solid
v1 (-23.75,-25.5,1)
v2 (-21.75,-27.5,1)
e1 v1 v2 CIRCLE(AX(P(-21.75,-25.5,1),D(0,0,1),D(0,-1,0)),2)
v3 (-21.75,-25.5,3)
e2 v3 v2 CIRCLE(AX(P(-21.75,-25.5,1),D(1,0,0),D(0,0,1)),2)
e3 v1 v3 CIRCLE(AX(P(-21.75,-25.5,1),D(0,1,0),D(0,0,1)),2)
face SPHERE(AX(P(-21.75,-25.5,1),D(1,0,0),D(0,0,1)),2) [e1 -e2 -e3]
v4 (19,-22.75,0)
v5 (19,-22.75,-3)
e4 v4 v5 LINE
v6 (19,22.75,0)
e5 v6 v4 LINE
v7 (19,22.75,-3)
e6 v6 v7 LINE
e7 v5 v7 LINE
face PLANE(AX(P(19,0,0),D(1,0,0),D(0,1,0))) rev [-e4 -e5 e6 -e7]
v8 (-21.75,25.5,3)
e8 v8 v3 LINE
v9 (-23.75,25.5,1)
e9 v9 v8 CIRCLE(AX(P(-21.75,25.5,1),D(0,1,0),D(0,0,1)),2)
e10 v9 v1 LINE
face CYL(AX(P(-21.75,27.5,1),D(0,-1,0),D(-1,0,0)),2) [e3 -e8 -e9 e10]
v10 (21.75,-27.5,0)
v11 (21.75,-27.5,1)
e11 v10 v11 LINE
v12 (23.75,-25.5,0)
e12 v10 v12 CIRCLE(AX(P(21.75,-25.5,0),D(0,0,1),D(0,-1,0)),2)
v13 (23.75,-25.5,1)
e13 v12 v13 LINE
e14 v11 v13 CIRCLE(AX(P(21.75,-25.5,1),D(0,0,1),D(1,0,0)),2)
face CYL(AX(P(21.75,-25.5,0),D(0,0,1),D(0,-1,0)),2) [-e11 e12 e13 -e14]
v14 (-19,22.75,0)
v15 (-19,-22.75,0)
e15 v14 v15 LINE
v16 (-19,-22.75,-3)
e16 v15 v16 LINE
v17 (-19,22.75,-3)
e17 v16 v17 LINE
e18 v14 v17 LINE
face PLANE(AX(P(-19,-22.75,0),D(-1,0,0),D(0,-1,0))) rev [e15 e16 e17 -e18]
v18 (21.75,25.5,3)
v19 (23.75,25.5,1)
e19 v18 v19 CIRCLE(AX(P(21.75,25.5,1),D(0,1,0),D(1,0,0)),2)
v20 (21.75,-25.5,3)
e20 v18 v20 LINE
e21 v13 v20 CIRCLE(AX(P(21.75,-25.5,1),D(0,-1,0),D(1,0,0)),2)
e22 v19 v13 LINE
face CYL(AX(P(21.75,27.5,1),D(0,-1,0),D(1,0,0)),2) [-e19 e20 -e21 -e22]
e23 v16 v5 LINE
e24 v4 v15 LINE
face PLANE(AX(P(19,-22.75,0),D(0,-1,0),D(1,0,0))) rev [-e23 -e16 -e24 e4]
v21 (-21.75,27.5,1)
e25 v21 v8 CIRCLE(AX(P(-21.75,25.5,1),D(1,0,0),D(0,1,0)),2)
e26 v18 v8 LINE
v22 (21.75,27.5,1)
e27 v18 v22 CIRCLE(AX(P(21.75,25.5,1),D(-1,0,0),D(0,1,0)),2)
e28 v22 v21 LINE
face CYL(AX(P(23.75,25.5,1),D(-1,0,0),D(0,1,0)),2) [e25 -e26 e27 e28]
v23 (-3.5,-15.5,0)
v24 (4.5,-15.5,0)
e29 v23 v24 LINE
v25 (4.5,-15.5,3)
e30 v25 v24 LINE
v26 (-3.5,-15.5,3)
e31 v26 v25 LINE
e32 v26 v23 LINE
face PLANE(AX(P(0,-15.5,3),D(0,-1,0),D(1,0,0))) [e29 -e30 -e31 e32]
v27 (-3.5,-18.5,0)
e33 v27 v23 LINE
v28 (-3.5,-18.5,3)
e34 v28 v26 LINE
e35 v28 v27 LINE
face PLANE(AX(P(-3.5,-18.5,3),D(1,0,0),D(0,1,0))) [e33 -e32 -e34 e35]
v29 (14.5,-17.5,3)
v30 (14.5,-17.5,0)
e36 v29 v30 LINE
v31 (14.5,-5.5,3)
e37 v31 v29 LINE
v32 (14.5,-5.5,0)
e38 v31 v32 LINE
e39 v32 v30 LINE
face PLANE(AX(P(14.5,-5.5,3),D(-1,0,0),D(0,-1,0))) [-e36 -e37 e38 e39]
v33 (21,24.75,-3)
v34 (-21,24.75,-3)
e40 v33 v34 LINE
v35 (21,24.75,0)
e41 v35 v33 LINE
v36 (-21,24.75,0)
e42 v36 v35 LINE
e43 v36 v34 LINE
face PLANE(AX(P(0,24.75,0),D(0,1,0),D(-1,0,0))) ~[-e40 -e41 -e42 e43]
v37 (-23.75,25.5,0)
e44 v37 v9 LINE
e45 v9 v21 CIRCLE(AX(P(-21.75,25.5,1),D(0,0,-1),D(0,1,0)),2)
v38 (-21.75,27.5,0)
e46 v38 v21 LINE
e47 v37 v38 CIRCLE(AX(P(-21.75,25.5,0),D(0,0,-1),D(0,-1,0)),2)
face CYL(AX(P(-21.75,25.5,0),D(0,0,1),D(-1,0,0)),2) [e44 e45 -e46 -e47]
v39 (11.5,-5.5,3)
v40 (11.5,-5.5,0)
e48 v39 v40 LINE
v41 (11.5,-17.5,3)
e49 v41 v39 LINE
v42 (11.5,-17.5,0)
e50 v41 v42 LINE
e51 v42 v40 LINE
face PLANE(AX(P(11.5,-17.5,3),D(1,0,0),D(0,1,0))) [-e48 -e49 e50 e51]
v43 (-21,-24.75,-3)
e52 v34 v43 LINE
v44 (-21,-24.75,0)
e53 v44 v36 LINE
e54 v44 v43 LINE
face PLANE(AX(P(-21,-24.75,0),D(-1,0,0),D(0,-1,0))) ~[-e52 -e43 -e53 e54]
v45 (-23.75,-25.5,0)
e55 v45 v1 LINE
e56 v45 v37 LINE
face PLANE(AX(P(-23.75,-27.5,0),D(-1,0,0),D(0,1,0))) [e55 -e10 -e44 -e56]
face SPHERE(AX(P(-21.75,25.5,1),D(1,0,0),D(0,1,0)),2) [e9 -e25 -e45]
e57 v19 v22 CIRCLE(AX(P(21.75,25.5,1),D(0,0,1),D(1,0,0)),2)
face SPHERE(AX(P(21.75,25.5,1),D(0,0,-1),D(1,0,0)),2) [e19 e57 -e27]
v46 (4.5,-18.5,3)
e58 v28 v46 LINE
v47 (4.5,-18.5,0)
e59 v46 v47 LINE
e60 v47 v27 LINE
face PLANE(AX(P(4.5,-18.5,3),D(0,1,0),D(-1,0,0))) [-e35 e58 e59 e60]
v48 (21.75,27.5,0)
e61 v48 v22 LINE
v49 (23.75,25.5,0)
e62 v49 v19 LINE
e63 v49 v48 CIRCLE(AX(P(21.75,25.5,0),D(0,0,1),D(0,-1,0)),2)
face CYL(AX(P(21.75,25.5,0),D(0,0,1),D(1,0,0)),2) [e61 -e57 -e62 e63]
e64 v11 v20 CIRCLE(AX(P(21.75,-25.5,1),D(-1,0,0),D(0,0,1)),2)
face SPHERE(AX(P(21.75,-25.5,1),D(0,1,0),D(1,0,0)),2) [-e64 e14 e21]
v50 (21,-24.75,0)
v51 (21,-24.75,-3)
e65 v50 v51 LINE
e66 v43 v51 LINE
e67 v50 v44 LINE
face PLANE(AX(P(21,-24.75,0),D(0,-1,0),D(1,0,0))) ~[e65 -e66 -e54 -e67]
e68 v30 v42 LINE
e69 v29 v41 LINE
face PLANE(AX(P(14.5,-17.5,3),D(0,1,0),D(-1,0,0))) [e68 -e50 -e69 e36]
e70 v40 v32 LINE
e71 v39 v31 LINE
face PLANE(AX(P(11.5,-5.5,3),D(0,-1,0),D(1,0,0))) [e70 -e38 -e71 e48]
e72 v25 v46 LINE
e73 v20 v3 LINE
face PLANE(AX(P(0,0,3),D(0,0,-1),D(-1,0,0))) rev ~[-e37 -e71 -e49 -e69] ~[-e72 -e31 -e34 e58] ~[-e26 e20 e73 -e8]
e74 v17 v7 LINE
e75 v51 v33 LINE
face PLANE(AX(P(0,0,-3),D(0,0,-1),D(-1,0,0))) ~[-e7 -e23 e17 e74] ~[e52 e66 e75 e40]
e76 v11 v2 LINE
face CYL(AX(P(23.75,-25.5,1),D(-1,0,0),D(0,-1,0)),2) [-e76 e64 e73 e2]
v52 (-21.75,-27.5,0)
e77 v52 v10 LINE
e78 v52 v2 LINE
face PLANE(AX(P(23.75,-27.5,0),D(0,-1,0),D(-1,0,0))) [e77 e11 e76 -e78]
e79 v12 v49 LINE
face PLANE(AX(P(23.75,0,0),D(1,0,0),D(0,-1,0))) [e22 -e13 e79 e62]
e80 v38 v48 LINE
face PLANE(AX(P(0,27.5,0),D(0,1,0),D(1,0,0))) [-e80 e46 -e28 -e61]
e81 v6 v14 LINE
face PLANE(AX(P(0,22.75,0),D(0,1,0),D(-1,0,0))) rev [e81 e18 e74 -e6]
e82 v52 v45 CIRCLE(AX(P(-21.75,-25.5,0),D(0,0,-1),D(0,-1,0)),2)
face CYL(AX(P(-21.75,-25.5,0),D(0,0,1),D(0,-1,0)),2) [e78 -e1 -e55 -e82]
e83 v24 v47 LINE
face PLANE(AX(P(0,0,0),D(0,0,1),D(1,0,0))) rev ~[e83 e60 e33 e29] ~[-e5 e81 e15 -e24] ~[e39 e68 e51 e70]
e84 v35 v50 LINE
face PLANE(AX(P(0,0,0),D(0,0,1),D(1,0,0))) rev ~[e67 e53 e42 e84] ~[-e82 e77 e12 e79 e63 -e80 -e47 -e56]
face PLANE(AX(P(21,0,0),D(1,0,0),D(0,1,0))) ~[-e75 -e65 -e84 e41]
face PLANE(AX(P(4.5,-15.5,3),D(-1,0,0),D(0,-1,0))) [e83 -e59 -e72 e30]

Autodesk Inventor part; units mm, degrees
ref_plane "YZ Plane" through (0, 0, 0) normal (1, 0, 0) x (0, 1, 0)
ref_plane "XZ Plane" through (0, 0, 0) normal (0, 1, 0) x (-1, 0, 0)
sketch "Náčrt1" plane through (0, 0, 0) normal (0, 0, 1) x (1, 0, 0)
  line L0 (0, 35) -> (0, -35) projected
  line L1 (-29.75, 0) -> (29.75, 0) projected
  line L2 (21.25, -25) -> (-21.25, -25)
  line L3 (-21.25, -25) -> (-21.25, 25)
  line L4 (-21.25, 25) -> (21.25, 25)
  line L5 (21.25, 25) -> (21.25, -25)
  point P0 (0, 0)
  dimension "d0" = 42.5
  dimension "d1" = 50
extrude "Vysunutí1" add sketch "Náčrt1" along normal blind 3
sketch "Náčrt2" plane through (0, 0, 3) normal (0, 0, 1) x (1, 0, 0)
  line L0 (21.25, 25) -> (-21.25, 25) projected
  line L1 (-21.25, 25) -> (-21.25, -25) projected
  line L2 (-21.25, -25) -> (21.25, -25) projected
  line L3 (21.25, -25) -> (21.25, 25) projected
  line L4 (0, 35) -> (0, -35) projected
  line L5 (-29.75, 0) -> (29.75, 0) projected
  line L6 (4.5, -18.5) -> (-3.5, -18.5)
  line L7 (-3.5, -18.5) -> (-3.5, -15.5)
  line L8 (-3.5, -15.5) -> (4.5, -15.5)
  line L9 (4.5, -15.5) -> (4.5, -18.5)
  line L10 (14.5, -17.5) -> (11.5, -17.5)
  line L11 (11.5, -17.5) -> (11.5, -5.5)
  line L12 (11.5, -5.5) -> (14.5, -5.5)
  line L13 (14.5, -5.5) -> (14.5, -17.5)
  line L14 (-17.5, 21.5) -> (17.5, 21.5) construction
  line L15 (17.5, 21.5) -> (17.5, -21.5) construction
  line L16 (17.5, -21.5) -> (-17.5, -21.5) construction
  line L17 (-17.5, -21.5) -> (-17.5, 21.5) construction
  point P0 (0, 0)
  dimension "d4" = 12
  dimension "d5" = 3
  dimension "d6" = 8
  dimension "d7" = 3
  dimension "d9" = 35
  dimension "d10" = 43
  dimension "d11" = 3
  dimension "d13" = 3
  dimension "d29" = 16
  dimension "d30" = 21
extrude "Vysunutí2" cut sketch "Náčrt2" against normal through all contours L8 L9 L6 L4 | L4 L6 L7 L8 | L10 L11 L12 L13
sketch "Náčrt3" plane through (0, 0, 3) normal (0, 0, 1) x (1, 0, 0)
  line L0 (-3.5, -18.5) -> (-3.5, -15.5) projected
  line L1 (-3.5, -15.5) -> (4.5, -15.5) projected
  line L2 (4.5, -15.5) -> (4.5, -18.5) projected
  line L3 (4.5, -18.5) -> (-3.5, -18.5) projected
  line L4 (11.5, -17.5) -> (11.5, -5.5) projected
  line L5 (11.5, -5.5) -> (14.5, -5.5) projected
  line L6 (14.5, -5.5) -> (14.5, -17.5) projected
  line L7 (14.5, -17.5) -> (11.5, -17.5) projected
  line L8 (21.25, 25) -> (-21.25, 25) projected
  line L9 (-21.25, 25) -> (-21.25, -25) projected
  line L10 (-21.25, -25) -> (21.25, -25) projected
  line L11 (21.25, -25) -> (21.25, 25) projected
  line L12 (0, 38.5) -> (0, -38.5) projected
  line L13 (-33.25, 0) -> (33.25, 0) projected
  line L14 (-19, 22.75) -> (19, 22.75)
  line L15 (19, 22.75) -> (19, -22.75)
  line L16 (19, -22.75) -> (-19, -22.75)
  line L17 (-19, -22.75) -> (-19, 22.75)
  line L18 (-21, 24.75) -> (21, 24.75)
  line L19 (21, 24.75) -> (21, -24.75)
  line L20 (21, -24.75) -> (-21, -24.75)
  line L21 (-21, -24.75) -> (-21, 24.75)
  point P0 (0, 0)
  dimension "d31" = 0.25
  dimension "d32" = 2
extrude "Vysunutí3" add sketch "Náčrt3" along normal blind 3 contours L16 L15 L13 L19 L20 L12 | L12 L20 L21 L13 L17 L16 | L14 L17 L13 L21 L18 L12 | L12 L18 L19 L13 L15 L14
sketch "Náčrt6" plane through (0, 0, 0) normal (0, 0, -1) x (-1, 0, 0)
  line L0 (3.5, -15.5) -> (3.5, -18.5) projected
  line L1 (3.5, -18.5) -> (-4.5, -18.5) projected
  line L2 (-4.5, -18.5) -> (-4.5, -15.5) projected
  line L3 (-4.5, -15.5) -> (3.5, -15.5) projected
  line L4 (-11.5, -5.5) -> (-11.5, -17.5) projected
  line L5 (-11.5, -17.5) -> (-14.5, -17.5) projected
  line L6 (-14.5, -17.5) -> (-14.5, -5.5) projected
  line L7 (-14.5, -5.5) -> (-11.5, -5.5) projected
  line L8 (-21.25, 25) -> (21.25, 25) projected
  line L9 (-21.25, -25) -> (-21.25, 25) projected
  line L10 (21.25, -25) -> (-21.25, -25) projected
  line L11 (21.25, 25) -> (21.25, -25) projected
  line L12 (0, -35) -> (0, 35) projected
  line L13 (-29.75, 0) -> (29.75, 0) projected
  line L14 (23.75, 27.5) -> (-23.75, 27.5)
  line L15 (-23.75, 27.5) -> (-23.75, -27.5)
  line L16 (-23.75, -27.5) -> (23.75, -27.5)
  line L17 (23.75, -27.5) -> (23.75, 27.5)
  point P0 (0, 0)
  dimension "d33" = 2.5
extrude "Vysunutí6" add sketch "Náčrt6" against normal up to surface (3 mm away) contours L12 L16 L15 L13 L9 L10 | L10 L11 L13 L17 L16 L12 | L12 L14 L17 L13 L11 L8 | L8 L9 L13 L15 L14 L12
ref_plane "Pracovní rovina1" through (0, 0, 1.5) normal (0, 0, -1) x (-1, 0, 0)
mirror "Zrcadlit1" about plane through (0, 0, 1.5) normal (0, 0, -1) of "Vysunutí3"
ref_plane "Pracovní rovina2" through (0, 0, 3) normal (0, 0, 1) x (1, 0, 0)
split "Rozdělit1" plane through (0, 0, 3) removes the side toward (0, 0, 1)
fillet "Zaoblení4" radius 2 8 edges at (23.75, 27.5, 1.5) (23.75, 0, 3) (0, 27.5, 3) (23.75, -27.5, 1.5) (0, -27.5, 3) (-23.75, 27.5, 1.5) (-23.75, 0, 3) (-23.75, -27.5, 1.5)
properties part number "a4988_box_lid_3D tisk"
